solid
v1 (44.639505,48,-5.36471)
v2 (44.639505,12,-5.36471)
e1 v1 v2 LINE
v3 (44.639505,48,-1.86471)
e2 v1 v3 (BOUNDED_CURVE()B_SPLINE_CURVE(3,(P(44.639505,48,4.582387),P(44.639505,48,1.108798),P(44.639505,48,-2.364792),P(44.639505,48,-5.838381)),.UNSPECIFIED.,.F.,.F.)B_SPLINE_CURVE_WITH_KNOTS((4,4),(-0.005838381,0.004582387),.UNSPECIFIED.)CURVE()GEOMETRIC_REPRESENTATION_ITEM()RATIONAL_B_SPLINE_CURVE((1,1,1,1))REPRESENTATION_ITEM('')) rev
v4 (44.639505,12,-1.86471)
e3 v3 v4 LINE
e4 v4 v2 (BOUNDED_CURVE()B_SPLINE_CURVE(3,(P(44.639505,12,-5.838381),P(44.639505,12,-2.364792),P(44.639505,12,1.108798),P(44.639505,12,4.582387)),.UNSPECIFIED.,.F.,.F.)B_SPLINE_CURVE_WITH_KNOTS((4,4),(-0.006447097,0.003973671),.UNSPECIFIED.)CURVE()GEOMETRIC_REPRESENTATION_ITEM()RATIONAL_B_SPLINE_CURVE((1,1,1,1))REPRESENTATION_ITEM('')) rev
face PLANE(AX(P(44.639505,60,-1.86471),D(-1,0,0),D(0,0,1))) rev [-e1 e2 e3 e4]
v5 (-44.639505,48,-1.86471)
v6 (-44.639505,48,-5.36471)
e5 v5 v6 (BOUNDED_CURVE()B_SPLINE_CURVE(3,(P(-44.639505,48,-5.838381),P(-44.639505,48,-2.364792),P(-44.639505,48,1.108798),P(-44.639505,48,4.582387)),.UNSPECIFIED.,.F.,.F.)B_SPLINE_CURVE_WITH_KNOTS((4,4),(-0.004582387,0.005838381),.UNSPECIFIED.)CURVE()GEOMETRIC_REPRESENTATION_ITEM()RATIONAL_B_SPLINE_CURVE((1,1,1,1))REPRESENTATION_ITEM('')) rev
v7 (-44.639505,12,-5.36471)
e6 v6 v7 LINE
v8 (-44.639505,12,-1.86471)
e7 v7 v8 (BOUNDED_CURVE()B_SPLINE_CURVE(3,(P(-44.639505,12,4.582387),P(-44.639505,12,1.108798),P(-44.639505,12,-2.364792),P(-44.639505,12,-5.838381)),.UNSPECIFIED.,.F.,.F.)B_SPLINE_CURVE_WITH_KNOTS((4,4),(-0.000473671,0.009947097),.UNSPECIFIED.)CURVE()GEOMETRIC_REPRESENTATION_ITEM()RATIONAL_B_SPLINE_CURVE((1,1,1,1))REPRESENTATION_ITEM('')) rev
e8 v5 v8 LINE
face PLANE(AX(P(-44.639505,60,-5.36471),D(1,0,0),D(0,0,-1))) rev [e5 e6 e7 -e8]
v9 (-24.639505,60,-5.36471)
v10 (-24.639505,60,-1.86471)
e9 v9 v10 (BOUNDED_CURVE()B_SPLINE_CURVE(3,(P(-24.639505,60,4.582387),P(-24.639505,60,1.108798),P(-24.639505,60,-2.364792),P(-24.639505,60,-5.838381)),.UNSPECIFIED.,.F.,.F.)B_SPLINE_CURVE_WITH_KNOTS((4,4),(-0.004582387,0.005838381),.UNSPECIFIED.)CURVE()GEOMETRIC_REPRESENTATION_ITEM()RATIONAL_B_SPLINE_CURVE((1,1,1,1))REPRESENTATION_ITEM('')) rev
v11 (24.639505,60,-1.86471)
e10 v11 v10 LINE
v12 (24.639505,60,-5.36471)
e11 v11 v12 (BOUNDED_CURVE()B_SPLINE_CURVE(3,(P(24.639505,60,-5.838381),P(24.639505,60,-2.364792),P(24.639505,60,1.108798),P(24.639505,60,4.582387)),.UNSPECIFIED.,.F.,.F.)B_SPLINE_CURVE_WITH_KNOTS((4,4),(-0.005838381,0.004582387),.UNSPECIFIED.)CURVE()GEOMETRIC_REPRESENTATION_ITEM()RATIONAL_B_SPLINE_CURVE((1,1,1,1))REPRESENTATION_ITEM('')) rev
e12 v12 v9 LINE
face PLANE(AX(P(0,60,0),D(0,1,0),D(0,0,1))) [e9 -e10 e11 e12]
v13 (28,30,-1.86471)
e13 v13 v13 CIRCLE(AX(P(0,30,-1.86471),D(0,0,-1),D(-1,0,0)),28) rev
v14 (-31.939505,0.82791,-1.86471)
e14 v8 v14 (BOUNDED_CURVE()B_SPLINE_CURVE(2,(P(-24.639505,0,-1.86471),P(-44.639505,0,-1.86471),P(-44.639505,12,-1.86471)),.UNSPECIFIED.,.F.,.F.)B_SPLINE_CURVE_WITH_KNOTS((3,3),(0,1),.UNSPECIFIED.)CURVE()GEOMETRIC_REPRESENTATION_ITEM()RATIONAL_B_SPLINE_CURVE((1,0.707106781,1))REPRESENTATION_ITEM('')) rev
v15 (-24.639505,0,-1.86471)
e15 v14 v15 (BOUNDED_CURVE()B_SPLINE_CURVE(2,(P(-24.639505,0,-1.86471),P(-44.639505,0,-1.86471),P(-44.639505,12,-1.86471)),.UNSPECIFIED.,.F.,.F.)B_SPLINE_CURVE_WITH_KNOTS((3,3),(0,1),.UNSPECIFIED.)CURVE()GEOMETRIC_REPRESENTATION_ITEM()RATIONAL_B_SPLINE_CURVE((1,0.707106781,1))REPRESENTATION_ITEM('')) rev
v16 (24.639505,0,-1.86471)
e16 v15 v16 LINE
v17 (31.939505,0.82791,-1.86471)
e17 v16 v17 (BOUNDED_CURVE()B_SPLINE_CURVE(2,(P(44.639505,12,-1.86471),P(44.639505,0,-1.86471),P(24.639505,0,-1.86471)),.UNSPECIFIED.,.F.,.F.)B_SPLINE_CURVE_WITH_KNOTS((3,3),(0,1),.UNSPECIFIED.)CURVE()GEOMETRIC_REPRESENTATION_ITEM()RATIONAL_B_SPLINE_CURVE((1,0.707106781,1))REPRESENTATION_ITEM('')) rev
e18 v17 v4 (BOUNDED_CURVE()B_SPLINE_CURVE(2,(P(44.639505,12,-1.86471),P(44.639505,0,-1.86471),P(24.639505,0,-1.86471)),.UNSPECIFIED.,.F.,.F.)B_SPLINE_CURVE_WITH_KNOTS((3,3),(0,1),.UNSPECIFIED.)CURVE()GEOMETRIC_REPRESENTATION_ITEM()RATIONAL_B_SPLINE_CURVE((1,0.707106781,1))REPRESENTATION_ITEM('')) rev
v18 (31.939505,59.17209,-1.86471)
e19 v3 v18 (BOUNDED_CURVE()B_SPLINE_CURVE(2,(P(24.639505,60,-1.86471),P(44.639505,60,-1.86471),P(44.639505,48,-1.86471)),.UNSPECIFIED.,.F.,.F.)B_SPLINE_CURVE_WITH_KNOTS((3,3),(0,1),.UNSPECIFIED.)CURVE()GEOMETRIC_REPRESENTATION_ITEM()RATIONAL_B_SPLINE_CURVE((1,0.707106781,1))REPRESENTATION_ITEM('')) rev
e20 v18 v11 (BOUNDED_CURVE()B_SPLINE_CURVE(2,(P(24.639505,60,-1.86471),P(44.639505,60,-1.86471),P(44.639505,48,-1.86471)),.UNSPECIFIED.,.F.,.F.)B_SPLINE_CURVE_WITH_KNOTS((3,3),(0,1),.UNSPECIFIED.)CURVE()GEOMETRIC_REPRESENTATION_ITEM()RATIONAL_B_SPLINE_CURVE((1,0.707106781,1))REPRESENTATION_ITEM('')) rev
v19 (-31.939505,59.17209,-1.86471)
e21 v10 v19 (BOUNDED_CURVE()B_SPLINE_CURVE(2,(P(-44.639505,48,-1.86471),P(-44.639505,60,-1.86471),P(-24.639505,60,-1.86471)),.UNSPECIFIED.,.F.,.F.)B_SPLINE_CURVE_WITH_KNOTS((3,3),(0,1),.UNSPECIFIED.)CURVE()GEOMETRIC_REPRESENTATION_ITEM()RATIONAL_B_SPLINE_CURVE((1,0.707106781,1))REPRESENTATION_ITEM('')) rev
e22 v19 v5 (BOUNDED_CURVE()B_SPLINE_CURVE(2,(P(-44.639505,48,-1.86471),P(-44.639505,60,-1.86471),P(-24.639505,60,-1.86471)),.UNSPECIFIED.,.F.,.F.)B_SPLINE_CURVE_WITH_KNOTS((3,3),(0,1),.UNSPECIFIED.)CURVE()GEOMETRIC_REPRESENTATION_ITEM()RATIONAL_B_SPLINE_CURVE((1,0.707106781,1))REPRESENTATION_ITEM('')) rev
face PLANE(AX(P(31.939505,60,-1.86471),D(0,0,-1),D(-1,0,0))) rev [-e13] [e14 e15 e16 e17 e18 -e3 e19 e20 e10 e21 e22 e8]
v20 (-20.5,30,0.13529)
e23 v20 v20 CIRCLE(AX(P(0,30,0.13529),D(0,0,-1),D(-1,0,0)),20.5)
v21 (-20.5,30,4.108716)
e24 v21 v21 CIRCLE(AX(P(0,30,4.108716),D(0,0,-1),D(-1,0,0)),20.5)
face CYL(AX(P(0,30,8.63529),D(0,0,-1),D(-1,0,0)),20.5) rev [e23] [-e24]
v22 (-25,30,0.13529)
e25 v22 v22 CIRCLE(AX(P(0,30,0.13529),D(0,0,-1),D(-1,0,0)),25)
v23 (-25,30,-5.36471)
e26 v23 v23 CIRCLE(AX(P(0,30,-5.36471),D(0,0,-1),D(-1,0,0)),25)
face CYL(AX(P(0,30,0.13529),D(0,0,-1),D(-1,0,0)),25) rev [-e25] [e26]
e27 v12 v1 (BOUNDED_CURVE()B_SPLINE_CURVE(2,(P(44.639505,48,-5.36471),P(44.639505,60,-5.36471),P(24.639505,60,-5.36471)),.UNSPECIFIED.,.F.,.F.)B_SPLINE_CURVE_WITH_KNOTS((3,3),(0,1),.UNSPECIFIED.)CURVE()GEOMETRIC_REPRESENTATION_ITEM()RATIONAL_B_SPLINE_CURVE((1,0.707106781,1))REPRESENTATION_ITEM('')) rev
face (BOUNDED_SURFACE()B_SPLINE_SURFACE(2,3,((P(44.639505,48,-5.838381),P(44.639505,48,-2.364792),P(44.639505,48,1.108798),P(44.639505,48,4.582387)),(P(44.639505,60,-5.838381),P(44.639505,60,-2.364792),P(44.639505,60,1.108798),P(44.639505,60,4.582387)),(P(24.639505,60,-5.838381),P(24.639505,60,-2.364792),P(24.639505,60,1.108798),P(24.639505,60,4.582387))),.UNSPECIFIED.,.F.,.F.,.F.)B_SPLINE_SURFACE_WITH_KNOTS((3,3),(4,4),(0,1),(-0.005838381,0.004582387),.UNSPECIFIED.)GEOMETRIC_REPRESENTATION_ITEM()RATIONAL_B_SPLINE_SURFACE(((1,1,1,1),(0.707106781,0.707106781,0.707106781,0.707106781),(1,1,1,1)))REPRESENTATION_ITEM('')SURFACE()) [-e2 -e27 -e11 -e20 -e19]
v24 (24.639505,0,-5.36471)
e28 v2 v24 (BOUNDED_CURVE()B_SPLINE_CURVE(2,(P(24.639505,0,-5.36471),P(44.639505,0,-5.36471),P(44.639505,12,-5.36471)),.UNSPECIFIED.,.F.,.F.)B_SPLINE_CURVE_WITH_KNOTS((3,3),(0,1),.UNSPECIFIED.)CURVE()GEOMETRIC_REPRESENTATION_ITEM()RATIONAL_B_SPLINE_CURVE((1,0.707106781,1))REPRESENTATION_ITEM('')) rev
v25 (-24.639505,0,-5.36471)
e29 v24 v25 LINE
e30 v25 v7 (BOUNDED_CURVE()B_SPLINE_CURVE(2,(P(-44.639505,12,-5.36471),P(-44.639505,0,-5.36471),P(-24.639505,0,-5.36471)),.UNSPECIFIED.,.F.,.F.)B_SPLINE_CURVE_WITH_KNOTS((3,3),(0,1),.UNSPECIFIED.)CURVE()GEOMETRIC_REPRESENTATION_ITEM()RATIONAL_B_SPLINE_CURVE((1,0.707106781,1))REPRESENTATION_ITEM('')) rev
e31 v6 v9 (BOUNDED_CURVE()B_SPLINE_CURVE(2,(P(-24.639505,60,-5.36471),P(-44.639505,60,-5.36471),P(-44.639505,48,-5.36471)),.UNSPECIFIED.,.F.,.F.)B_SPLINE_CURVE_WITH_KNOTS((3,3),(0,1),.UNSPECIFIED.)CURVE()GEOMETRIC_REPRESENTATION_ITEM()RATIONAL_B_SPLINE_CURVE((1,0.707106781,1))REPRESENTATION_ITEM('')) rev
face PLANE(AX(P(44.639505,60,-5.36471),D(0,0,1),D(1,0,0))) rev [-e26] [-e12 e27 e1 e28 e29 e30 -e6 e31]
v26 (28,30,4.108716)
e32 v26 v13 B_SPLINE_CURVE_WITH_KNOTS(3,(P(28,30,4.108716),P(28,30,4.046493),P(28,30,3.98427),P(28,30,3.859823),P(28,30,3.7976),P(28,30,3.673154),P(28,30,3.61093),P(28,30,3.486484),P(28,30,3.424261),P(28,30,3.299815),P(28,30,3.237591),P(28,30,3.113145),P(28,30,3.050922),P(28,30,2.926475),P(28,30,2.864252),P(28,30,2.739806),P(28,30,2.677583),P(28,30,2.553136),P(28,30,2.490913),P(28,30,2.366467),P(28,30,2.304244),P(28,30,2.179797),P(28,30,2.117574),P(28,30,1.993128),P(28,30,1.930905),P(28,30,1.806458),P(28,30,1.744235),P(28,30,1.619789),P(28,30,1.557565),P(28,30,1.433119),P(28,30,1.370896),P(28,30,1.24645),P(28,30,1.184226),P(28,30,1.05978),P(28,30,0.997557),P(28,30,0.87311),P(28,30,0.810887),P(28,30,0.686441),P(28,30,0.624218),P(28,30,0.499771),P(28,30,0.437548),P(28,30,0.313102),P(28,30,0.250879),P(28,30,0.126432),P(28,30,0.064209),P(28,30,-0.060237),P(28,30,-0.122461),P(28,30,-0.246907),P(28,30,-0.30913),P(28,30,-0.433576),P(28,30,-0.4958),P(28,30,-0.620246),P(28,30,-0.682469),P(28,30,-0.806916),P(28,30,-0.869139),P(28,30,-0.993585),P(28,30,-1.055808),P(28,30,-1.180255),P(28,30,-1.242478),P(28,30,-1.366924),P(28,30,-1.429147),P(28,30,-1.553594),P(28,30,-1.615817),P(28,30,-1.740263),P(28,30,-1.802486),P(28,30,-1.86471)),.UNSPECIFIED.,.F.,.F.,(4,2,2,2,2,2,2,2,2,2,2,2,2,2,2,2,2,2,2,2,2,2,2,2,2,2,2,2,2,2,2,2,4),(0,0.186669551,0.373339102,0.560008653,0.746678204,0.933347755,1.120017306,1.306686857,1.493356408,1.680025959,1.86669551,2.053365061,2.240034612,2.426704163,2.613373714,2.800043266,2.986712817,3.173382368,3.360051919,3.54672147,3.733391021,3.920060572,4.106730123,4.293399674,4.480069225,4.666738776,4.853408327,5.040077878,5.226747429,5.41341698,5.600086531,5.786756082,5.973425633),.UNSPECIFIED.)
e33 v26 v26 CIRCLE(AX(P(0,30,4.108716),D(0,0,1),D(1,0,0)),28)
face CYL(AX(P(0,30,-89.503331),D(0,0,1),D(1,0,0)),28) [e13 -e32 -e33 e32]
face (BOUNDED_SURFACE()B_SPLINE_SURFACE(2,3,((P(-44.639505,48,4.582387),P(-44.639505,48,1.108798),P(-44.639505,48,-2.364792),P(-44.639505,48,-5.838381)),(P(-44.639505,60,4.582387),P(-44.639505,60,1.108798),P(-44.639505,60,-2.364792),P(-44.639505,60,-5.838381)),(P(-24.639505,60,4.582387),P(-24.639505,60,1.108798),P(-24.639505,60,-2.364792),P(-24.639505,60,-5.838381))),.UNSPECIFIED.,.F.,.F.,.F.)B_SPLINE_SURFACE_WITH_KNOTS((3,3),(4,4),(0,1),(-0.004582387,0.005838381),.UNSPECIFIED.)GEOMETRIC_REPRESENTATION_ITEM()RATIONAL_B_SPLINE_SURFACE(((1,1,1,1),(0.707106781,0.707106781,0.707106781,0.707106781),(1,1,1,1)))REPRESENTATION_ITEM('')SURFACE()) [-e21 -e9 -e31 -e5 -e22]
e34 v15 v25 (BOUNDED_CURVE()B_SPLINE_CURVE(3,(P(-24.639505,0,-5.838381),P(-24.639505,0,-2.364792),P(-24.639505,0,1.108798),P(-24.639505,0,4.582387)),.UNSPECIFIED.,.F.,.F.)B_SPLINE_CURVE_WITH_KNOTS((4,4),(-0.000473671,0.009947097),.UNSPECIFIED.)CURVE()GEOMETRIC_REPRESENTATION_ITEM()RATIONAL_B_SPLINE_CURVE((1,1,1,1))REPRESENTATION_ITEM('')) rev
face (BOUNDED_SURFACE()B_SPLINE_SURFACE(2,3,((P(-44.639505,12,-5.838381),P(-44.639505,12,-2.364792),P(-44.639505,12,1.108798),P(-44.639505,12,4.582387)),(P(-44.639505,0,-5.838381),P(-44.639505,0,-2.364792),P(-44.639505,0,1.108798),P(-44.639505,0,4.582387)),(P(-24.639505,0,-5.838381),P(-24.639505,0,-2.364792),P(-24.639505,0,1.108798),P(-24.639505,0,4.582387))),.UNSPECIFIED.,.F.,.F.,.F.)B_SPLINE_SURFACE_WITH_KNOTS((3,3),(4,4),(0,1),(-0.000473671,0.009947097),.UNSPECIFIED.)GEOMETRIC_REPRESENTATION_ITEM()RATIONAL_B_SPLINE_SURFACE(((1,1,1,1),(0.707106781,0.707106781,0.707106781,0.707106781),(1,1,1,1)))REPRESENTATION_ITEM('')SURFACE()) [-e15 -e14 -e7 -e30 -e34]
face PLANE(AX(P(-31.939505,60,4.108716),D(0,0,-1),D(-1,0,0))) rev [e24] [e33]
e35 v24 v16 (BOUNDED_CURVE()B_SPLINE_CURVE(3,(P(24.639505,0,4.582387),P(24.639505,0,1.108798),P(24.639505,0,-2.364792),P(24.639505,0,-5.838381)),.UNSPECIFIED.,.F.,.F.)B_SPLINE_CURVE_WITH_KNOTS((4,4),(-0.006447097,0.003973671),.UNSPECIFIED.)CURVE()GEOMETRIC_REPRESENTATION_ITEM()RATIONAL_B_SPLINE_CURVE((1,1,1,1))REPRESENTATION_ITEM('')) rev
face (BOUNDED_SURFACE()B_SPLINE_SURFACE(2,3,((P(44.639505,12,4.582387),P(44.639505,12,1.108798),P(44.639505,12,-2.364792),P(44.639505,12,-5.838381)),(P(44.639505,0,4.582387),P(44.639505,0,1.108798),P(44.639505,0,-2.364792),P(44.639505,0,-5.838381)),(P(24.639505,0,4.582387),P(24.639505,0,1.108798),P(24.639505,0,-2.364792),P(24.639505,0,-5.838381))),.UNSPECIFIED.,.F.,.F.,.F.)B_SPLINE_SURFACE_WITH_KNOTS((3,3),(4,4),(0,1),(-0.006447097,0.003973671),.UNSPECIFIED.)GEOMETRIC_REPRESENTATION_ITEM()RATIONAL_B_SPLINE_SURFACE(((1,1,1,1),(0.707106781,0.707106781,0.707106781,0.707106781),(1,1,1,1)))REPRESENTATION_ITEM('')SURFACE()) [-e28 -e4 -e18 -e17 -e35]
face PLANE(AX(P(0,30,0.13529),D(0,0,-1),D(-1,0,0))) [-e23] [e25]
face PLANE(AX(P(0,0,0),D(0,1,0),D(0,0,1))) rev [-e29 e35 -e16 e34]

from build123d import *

# Parameters (mm, degrees)
BOSS_EXTRUDE1_DEPTH = 60
SKETCH2_R           = 25
CUT_EXTRUDE1_DEPTH  = 5.5
FILLET1_SIZE        = 12
FILLET1_SIZE_2      = 20
FILLET2_SIZE        = 20
FILLET2_SIZE_2      = 12
FILLET3_SIZE        = 20
FILLET3_SIZE_2      = 12
SKETCH4_R           = 20.5
CUT_EXTRUDE2_DEPTH  = 8.5
SKETCH6_R           = 28
CUT_EXTRUDE3_DEPTH  = 5.973425633


with BuildPart() as part:
    # Sketch1 → Boss-Extrude1 (new body)
    with BuildSketch(Plane(origin=(0, 0, 0), x_dir=(1, 0, 0), z_dir=(0, 1, 0))):
        Polygon((-44.639505024, 1.864709672), (-31.939505024, 1.864709672), (-31.939505024, -4.108715961), (31.939505024, -4.108715961), (31.939505024, 1.864709672), (44.639505024, 1.864709672), (44.639505024, 5.364709672), (-44.639505024, 5.364709672), align=None)
    extrude(amount=BOSS_EXTRUDE1_DEPTH)

    # Sketch2 → Cut-Extrude1 (cut)
    with BuildSketch(Plane(origin=(0, 0, -5.364709672), x_dir=(-1, 0, 0), z_dir=(0, 0, -1))):
        with Locations((0, 30)):
            Circle(SKETCH2_R)
    extrude(amount=-CUT_EXTRUDE1_DEPTH, mode=Mode.SUBTRACT)

    # Fillet1
    # an asymmetric fillet: 20, 12 mm, written as the material it takes off along each edge
    with BuildSketch(Plane(origin=(-44.639505024, 60, -55.364709672), x_dir=(0, -1, 0), z_dir=(0, 0, 1))) as fillet1_piece_1:
        with BuildLine():
            Bezier((FILLET1_SIZE, 0), (0, 0), (0, FILLET1_SIZE_2), weights=[1, 0.707106781, 1])
            Line((0, FILLET1_SIZE_2), (0, 0))
            Line((0, 0), (FILLET1_SIZE, 0))
        make_face()
    extrude(amount=103.5, mode=Mode.SUBTRACT)
    with BuildSketch(Plane(origin=(44.639505024, 60, 48.135290328), x_dir=(-1, 0, 0), z_dir=(0, 0, -1))) as fillet1_piece_2:
        with BuildLine():
            Bezier((FILLET1_SIZE_2, 0), (0, 0), (0, -FILLET1_SIZE), weights=[1, 0.707106781, 1])
            Line((0, -FILLET1_SIZE), (0, 0))
            Line((0, 0), (FILLET1_SIZE_2, 0))
        make_face()
    extrude(amount=103.5, mode=Mode.SUBTRACT)

    # Fillet2
    # an asymmetric fillet: 20, 12 mm, written as the material it takes off along each edge
    with BuildSketch(Plane(origin=(44.639505024, 0, 48.135290328), x_dir=(-1, 0, 0), z_dir=(0, 0, -1))) as fillet2_piece_1:
        with BuildLine():
            Bezier((FILLET2_SIZE, 0), (0, 0), (0, FILLET2_SIZE_2), weights=[1, 0.707106781, 1])
            Line((0, FILLET2_SIZE_2), (0, 0))
            Line((0, 0), (FILLET2_SIZE, 0))
        make_face()
    extrude(amount=103.5, mode=Mode.SUBTRACT)

    # Fillet3
    # an asymmetric fillet: 20, 12 mm, written as the material it takes off along each edge
    with BuildSketch(Plane(origin=(-44.639505024, 0, -55.364709672), x_dir=(1, 0, 0), z_dir=(0, 0, 1))) as fillet3_piece_1:
        with BuildLine():
            Bezier((FILLET3_SIZE, 0), (0, 0), (0, FILLET3_SIZE_2), weights=[1, 0.707106781, 1])
            Line((0, FILLET3_SIZE_2), (0, 0))
            Line((0, 0), (FILLET3_SIZE, 0))
        make_face()
    extrude(amount=103.5, mode=Mode.SUBTRACT)

    # Sketch4 → Cut-Extrude2 (cut)
    with BuildSketch(Plane(origin=(0, 0, 0.135290328), x_dir=(-1, 0, 0), z_dir=(0, 0, -1))):
        with Locations((0, 30)):
            Circle(SKETCH4_R)
    extrude(amount=-CUT_EXTRUDE2_DEPTH, mode=Mode.SUBTRACT)

    # Sketch6 → Cut-Extrude3 (cut)
    with BuildSketch(Plane.XY.offset(4.108715961)):
        with BuildLine():
            Line((-31.939505024, 59.172090225), (-31.939505024, 0.827909775))
            add(Edge.make_bspline(
                [(-31.939505024, 0.827909775), (-28.419914948, -2e-09), (-24.63950501, 0)],
                knots=[0, 0, 0, 1, 1, 1], degree=2))
            Line((-24.63950501, 0), (24.639505024, 0))
            add(Edge.make_bspline(
                [(24.639505024, 0), (28.419914955, 0), (31.939505024, 0.827909775)],
                knots=[0, 0, 0, 1, 1, 1], degree=2))
            Line((31.939505024, 0.827909775), (31.939505024, 59.172090225))
            add(Edge.make_bspline(
                [(31.939505024, 59.172090225), (28.419914948, 60.000000002), (24.63950501, 60)],
                knots=[0, 0, 0, 1, 1, 1], degree=2))
            Line((24.63950501, 60), (-24.639505024, 60))
            add(Edge.make_bspline(
                [(-24.639505024, 60), (-28.419914955, 60), (-31.939505024, 59.172090225)],
                knots=[0, 0, 0, 1, 1, 1], degree=2))
        make_face()
        with Locations((0, 30)):
            Circle(SKETCH6_R, mode=Mode.SUBTRACT)
    extrude(amount=-CUT_EXTRUDE3_DEPTH, mode=Mode.SUBTRACT)


solid = part.part
